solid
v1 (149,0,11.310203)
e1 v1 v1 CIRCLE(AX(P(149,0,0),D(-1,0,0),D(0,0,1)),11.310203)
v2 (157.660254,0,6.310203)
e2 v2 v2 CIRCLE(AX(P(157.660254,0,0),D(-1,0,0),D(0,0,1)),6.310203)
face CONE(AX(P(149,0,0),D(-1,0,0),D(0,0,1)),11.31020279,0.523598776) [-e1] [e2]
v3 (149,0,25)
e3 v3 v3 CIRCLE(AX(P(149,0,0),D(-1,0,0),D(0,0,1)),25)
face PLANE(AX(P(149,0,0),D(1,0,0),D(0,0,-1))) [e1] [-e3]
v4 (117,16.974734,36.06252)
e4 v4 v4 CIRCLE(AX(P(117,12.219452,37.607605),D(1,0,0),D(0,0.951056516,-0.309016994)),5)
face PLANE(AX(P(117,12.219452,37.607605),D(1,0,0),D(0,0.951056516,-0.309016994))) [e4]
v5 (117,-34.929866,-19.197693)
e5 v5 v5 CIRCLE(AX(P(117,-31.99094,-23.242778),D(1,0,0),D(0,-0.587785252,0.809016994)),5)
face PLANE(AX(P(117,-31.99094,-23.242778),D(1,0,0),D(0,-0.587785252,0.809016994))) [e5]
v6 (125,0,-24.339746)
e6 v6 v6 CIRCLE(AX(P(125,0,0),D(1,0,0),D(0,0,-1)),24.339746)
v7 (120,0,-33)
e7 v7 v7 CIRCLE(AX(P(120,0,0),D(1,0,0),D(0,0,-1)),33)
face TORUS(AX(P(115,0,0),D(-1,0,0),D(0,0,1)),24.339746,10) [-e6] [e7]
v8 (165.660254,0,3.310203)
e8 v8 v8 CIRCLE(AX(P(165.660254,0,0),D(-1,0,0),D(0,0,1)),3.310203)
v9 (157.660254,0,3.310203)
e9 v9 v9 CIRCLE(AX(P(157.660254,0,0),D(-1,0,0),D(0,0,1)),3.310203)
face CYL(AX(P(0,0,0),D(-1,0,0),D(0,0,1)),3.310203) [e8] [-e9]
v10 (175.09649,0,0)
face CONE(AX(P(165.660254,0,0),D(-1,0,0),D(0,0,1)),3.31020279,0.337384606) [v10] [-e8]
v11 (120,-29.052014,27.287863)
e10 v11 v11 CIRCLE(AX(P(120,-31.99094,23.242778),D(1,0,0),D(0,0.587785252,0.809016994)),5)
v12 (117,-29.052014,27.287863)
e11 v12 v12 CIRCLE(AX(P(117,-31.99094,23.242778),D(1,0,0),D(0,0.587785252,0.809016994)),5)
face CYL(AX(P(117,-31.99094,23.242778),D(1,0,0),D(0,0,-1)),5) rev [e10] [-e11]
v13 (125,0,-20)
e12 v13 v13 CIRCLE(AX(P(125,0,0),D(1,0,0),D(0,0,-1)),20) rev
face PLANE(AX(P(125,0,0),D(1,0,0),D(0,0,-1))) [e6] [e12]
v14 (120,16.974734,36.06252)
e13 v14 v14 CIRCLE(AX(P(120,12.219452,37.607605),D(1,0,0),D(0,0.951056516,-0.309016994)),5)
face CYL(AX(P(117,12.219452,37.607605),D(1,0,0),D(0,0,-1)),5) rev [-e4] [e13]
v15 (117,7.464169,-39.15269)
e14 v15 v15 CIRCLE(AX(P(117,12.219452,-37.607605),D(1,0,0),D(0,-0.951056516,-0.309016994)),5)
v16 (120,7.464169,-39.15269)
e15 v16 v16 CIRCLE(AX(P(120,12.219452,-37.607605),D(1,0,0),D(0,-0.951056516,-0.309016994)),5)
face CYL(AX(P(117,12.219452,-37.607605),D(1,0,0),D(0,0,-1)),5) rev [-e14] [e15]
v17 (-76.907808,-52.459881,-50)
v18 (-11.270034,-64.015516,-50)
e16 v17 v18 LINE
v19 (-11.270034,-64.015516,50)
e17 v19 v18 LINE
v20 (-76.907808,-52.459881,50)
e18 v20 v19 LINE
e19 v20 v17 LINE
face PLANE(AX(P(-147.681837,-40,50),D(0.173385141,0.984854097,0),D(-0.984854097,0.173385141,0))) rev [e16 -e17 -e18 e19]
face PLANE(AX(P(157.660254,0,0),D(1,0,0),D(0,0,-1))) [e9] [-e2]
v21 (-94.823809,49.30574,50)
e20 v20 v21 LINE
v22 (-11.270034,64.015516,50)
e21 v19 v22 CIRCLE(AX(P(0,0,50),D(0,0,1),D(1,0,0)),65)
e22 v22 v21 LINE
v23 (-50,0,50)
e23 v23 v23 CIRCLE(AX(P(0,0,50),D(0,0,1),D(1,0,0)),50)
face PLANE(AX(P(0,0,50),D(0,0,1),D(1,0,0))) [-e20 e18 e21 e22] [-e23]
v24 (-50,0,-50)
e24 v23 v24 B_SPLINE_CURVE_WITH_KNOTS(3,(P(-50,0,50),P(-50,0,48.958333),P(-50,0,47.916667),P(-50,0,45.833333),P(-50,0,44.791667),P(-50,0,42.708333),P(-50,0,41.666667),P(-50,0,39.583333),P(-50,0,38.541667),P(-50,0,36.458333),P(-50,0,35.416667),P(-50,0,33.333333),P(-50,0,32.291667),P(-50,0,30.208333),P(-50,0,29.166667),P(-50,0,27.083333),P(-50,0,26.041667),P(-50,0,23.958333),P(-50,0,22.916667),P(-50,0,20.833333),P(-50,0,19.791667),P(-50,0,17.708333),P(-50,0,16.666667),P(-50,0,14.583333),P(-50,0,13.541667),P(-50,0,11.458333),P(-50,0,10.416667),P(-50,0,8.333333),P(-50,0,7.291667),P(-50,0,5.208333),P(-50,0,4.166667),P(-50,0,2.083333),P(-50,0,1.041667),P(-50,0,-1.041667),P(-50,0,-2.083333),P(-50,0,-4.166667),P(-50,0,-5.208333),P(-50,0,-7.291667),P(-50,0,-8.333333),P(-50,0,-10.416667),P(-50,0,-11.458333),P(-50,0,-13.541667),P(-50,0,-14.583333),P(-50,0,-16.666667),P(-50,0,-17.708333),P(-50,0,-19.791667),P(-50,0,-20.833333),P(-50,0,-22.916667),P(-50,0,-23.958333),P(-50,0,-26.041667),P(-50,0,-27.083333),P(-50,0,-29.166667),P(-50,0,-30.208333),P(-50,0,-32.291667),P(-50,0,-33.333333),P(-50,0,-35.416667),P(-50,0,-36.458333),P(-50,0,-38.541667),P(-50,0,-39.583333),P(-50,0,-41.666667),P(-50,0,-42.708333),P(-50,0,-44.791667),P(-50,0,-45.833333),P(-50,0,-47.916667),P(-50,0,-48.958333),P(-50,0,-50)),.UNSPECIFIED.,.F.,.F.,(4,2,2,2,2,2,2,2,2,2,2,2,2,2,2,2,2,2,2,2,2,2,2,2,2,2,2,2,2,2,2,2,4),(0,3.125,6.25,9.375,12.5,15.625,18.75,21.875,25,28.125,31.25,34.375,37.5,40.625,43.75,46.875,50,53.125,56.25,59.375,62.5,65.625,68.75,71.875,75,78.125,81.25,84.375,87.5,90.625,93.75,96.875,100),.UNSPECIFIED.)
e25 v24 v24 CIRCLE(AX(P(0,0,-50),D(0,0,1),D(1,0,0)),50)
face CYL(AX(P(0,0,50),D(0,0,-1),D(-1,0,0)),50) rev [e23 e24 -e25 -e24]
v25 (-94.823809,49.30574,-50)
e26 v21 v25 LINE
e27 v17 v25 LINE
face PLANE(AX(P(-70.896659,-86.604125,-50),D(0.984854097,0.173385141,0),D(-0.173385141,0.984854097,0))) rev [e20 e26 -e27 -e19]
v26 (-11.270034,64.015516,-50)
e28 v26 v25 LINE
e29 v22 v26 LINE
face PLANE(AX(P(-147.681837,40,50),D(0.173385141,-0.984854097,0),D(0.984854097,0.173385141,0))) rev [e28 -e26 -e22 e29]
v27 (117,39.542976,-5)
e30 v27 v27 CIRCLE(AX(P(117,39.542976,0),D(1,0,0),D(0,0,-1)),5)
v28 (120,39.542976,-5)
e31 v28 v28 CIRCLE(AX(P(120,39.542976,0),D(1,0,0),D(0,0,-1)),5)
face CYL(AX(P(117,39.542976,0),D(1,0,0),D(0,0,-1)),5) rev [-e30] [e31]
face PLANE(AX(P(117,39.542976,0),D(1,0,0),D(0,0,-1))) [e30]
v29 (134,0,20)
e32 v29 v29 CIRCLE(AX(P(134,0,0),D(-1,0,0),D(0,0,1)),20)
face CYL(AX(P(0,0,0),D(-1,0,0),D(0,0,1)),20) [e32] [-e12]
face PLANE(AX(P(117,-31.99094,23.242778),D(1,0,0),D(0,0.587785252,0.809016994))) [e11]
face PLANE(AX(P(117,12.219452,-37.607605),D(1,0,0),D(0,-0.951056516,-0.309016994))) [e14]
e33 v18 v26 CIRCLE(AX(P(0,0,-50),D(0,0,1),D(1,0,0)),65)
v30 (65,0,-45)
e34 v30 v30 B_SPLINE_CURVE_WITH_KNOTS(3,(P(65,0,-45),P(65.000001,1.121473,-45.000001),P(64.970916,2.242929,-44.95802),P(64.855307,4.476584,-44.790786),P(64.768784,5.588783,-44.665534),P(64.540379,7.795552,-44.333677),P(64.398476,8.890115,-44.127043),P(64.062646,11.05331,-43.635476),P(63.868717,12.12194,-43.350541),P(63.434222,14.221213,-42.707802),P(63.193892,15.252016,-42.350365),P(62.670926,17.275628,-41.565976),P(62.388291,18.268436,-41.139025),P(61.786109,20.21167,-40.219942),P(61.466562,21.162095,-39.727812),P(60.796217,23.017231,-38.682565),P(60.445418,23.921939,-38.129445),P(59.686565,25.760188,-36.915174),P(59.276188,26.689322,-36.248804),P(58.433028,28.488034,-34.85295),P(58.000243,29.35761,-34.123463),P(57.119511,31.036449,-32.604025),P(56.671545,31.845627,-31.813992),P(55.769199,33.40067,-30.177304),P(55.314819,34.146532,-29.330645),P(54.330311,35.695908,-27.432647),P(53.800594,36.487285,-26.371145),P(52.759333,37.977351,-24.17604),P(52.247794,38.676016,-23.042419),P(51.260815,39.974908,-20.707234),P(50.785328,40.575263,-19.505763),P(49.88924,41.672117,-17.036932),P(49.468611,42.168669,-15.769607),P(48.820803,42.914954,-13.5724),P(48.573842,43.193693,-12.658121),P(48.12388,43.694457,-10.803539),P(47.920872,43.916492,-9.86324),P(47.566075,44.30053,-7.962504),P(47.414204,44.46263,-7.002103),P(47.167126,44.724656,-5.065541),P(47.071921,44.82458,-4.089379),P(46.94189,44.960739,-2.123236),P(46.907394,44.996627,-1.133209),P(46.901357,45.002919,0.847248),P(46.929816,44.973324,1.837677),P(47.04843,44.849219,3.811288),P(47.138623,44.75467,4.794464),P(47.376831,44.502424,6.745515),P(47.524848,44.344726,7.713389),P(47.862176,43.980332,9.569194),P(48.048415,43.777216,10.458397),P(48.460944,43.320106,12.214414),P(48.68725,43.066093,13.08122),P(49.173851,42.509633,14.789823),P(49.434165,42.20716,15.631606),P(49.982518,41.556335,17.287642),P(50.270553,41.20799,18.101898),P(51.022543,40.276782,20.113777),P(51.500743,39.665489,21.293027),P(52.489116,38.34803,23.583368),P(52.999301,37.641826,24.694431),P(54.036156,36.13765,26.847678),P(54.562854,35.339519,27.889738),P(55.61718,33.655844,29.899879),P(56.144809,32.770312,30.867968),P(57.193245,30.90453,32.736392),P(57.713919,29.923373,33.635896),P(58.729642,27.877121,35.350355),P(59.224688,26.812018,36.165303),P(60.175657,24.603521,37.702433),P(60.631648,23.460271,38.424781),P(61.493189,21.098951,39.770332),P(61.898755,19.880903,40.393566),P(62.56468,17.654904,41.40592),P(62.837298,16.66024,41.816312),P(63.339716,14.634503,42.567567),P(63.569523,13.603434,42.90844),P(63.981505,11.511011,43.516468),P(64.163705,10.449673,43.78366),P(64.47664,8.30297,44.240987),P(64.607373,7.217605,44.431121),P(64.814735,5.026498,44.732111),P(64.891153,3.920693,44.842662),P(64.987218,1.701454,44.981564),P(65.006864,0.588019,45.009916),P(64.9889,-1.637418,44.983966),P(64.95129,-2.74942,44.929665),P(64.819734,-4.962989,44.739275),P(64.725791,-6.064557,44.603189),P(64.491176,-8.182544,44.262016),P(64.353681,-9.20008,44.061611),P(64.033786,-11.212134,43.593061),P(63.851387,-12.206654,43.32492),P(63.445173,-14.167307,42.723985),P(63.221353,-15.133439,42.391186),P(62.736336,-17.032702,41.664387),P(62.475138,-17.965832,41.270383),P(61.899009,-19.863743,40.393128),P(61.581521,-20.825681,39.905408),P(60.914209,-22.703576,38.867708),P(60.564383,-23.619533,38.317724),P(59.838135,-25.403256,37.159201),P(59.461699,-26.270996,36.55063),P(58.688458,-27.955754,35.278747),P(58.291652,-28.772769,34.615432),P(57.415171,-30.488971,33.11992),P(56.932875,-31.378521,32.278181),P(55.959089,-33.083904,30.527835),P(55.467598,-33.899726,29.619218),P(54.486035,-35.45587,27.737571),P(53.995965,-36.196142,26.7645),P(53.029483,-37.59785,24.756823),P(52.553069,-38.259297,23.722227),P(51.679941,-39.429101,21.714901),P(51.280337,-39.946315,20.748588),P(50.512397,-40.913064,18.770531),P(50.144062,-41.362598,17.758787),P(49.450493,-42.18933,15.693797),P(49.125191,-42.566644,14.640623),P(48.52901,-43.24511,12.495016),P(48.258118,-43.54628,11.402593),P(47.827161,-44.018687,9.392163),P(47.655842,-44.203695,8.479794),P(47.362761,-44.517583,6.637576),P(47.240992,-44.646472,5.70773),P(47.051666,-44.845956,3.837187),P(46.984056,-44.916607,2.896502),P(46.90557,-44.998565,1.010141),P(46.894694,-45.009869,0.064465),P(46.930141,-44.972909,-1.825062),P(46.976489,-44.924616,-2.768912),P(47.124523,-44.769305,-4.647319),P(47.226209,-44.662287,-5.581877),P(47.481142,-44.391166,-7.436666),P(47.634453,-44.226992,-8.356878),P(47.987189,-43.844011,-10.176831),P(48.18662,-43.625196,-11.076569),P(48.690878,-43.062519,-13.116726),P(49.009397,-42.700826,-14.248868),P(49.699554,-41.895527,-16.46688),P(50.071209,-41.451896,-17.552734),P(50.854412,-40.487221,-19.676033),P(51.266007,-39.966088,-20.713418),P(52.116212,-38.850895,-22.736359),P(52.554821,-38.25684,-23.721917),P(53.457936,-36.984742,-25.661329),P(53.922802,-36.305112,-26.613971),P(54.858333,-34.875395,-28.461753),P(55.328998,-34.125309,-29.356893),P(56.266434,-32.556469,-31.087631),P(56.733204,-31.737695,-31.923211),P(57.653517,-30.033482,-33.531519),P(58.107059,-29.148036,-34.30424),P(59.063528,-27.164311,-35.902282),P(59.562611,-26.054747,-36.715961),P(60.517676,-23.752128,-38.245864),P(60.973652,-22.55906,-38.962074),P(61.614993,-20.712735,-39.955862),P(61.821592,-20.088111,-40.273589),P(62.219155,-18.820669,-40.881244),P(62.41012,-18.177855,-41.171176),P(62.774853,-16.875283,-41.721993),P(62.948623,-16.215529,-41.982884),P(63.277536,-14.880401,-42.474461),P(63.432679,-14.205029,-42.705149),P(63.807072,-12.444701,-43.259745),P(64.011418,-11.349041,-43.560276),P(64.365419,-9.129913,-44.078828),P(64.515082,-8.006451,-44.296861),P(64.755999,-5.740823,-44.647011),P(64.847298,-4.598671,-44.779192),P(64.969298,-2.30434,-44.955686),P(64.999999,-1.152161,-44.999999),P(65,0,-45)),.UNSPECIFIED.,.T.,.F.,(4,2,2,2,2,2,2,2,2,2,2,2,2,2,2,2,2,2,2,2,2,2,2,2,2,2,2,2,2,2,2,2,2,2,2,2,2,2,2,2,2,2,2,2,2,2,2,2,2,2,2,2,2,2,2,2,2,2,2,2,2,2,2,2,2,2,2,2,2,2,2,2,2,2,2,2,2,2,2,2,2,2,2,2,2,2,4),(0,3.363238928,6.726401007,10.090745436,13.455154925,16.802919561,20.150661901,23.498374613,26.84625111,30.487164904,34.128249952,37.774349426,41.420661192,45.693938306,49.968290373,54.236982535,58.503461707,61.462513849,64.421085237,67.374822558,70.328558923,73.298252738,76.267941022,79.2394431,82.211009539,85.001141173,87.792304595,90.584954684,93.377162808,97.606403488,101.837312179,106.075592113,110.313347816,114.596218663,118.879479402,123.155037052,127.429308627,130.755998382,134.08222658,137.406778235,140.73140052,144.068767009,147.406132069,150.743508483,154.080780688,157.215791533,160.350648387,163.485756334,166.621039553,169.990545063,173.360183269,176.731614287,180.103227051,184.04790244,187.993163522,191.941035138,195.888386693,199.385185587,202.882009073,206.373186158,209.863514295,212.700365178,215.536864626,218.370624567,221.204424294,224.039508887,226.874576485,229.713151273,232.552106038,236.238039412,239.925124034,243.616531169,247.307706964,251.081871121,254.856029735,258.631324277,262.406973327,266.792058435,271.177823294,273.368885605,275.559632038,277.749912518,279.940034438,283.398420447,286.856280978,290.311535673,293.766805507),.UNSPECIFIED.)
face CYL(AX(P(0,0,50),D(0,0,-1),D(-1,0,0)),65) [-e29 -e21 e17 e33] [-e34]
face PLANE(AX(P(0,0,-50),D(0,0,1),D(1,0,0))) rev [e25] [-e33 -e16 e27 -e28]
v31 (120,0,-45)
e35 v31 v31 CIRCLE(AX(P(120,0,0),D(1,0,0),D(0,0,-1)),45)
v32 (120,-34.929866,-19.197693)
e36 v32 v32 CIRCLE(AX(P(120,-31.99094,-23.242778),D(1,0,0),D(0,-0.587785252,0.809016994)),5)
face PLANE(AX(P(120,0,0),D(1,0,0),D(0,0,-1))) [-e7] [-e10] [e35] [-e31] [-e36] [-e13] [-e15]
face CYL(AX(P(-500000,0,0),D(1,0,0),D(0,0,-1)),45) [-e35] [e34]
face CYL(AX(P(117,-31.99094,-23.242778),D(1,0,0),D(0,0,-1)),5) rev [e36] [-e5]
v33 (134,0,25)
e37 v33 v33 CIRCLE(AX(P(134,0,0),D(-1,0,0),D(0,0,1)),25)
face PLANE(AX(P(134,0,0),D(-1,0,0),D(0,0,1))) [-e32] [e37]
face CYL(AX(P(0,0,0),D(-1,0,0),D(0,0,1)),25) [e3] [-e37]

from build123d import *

# Parameters (mm, degrees)
SKETCH1_R                = 50
BOSS_EXTRUDE1_DEPTH      = 50
BOSS_EXTRUDE2_REACH      = 281.962
BOSS_EXTRUDE2_END_RADIUS = 65
SKETCH2_R                = 45
SKETCH4_R                = 5
CUT_EXTRUDE4_DEPTH       = 3
CIRPATTERN2_COUNT        = 5
SKETCH5_R                = 33
BOSS_EXTRUDE3_DEPTH      = 5
FILLET1_R                = 10
SKETCH6_W                = 100
SKETCH6_H                = 80
CUT_EXTRUDE5_DEPTH       = 37
SKETCH7_W                = 37.232866149
SKETCH7_H                = 100
CUT_EXTRUDE6_DEPTH       = 8
SKETCH8_W                = 37
SKETCH8_H                = 100
CUT_EXTRUDE7_DEPTH       = 8
SKETCH9_W                = 16.438055999
SKETCH9_H                = 100
CUT_EXTRUDE8_DEPTH       = 138
CUT_EXTRUDE9_DEPTH       = 138
CUT_EXTRUDE10_DEPTH      = 138


with BuildPart() as part:
    # Sketch1 → Boss-Extrude1 (new, symmetric)
    with BuildSketch(Plane.XY):
        with BuildLine():
            Line((-147.681836523, 40), (-147.681836523, -40))
            Line((-147.681836523, -40), (-11.270034193, -64.015516317))
            ThreePointArc((-11.270034193, -64.015516317), (65, 0), (-11.270034193, 64.015516317))
            Line((-11.270034193, 64.015516317), (-147.681836523, 40))
        make_face()
        with Locations(Location((0, 0, 0), (0, 0, 180))):
            Circle(SKETCH1_R, mode=Mode.SUBTRACT)
    extrude(amount=BOSS_EXTRUDE1_DEPTH, both=True)

    # Boss-Extrude2: up to this cylinder (the profile starts outside it)
    boss_extrude2_end = Plane(origin=(0, 0, 0), z_dir=(0, 0, -1)) * Cylinder(BOSS_EXTRUDE2_END_RADIUS, 694.924, mode=Mode.PRIVATE)
    # Sketch2 → Boss-Extrude2 (add, up to the surface)
    with BuildSketch(Plane(origin=(120, 0, 0), x_dir=(0, 0, -1), z_dir=(1, 0, 0)), mode=Mode.PRIVATE) as boss_extrude2_sk1:
        Circle(SKETCH2_R)
    boss_extrude2_tool1 = extrude(boss_extrude2_sk1.sketch, amount=-BOSS_EXTRUDE2_REACH, mode=Mode.PRIVATE) - boss_extrude2_end
    add(boss_extrude2_tool1.solids().sort_by_distance((120, 0, 0))[0])

    # Sketch3 → Revolve1 (revolve)
    with BuildSketch(Plane.XY, mode=Mode.PRIVATE) as revolve1_sk:
        Polygon((175.096490443, 0), (120, 0), (120, -20), (134, -20), (134, -25), (149, -25), (149, -11.31020279), (157.660254038, -6.31020279), (157.660254038, -3.31020279), (165.660254038, -3.31020279), align=None)
    revolve(revolve1_sk.sketch.rotate(Axis((0, 0, 0), (1, 0, 0)), 270), axis=Axis((0, 0, 0), (1, 0, 0)))

    # Sketch4 → Cut-Extrude4 (cut)
    with BuildSketch(Plane(origin=(120, 0, 0), x_dir=(0, 0, -1), z_dir=(1, 0, 0))):
        with Locations((0, 39.542976343)):
            Circle(SKETCH4_R)
    cut_extrude4 = extrude(amount=-CUT_EXTRUDE4_DEPTH, mode=Mode.SUBTRACT)

    # CirPattern2: Cut-Extrude4 ×5 about axis
    cirpattern2_axis = Axis((0, 0, 0), (1, 0, 0))
    for i in range(1, CIRPATTERN2_COUNT):
        add(cut_extrude4.rotate(cirpattern2_axis, i * 360 / CIRPATTERN2_COUNT), mode=Mode.SUBTRACT)

    # Sketch5 → Boss-Extrude3 (add)
    with BuildSketch(Plane(origin=(120, 0, 0), x_dir=(0, 0, -1), z_dir=(1, 0, 0))):
        Circle(SKETCH5_R)
    extrude(amount=BOSS_EXTRUDE3_DEPTH)

    # Fillet1
    # the kernel refuses this fillet: 10 mm, written as the material it takes off along each edge
    with BuildSketch(Plane(origin=(125, 0, 0), x_dir=(0, 0, -1), z_dir=(0, -1, 0))) as fillet1_piece_1:
        with BuildLine():
            CenterArc((24.339745962, -10), FILLET1_R, 30, 60)
            Line((24.339745962, 0), (24.339745962, 0.2))
            Line((24.339745962, 0.2), (33, 0.2))
            Line((33, 0.2), (33.2, 0))
            ThreePointArc((33.2, 0), (33.2, -2.5), (33.173205081, -4.9))
            Line((33.173205081, -4.9), (33, -5))
        make_face()
    revolve(axis=Axis((125, 0, 0), (1, 0, 0)), mode=Mode.SUBTRACT)

    # Sketch6 → Cut-Extrude5 (cut)
    with BuildSketch(Plane.ZY.offset(147.681836523)):
        Rectangle(SKETCH6_W, SKETCH6_H)
    extrude(amount=-CUT_EXTRUDE5_DEPTH, mode=Mode.SUBTRACT)

    # Sketch7 → Cut-Extrude6 (cut)
    with BuildSketch(Plane(origin=(-11.270034193, 64.015516317, 0), x_dir=(0.9848540971786934, 0.17338514143472855, 0), z_dir=(-0.17338514143472852, 0.9848540971786933, 0))):
        with Locations((-119.893223046, 0)):
            Rectangle(SKETCH7_W, SKETCH7_H)
    extrude(amount=-CUT_EXTRUDE6_DEPTH, mode=Mode.SUBTRACT)

    # Sketch8 → Cut-Extrude7 (cut)
    with BuildSketch(Plane(origin=(0, -40, 0), x_dir=(1, 0, 0), z_dir=(0, 1, 0))):
        with Locations((-129.181836523, 0)):
            Rectangle(SKETCH8_W, SKETCH8_H)
    extrude(amount=-CUT_EXTRUDE7_DEPTH, mode=Mode.SUBTRACT)

    # Sketch9 → Cut-Extrude8 (cut)
    with BuildSketch(Plane(origin=(-11.270034193, 64.015516317, 0), x_dir=(0.9848540971786934, 0.17338514143472855, 0), z_dir=(-0.17338514143472852, 0.9848540971786933, 0))):
        with Locations((-93.057761973, 0)):
            Rectangle(SKETCH9_W, SKETCH9_H)
    extrude(amount=-CUT_EXTRUDE8_DEPTH, mode=Mode.SUBTRACT)


with BuildPart() as cut_extrude8_piece_1:
    # of the separate pieces the step leaves, piece 1, a body of its own (cut_extrude8_pieces)
    add(part.part.solids().sort_by_distance((-11.270034193, 64.015516317, 50))[0])


with BuildPart() as cut_extrude8_piece_2:
    # of the separate pieces the step leaves, piece 2, a body of its own (cut_extrude8_pieces)
    add(part.part.solids().sort_by_distance((-109.625814615, 38.576792986, 50))[0])

    # Sketch10 → Cut-Extrude9 (cut)
    with BuildSketch(Plane.XY.offset(50)):
        Polygon((-110.681836523, -46.51390927), (-110.681836523, 38.390878637), (-107.391706575, 38.390878637), (-90.237190338, -50.805264009), (-110.681836523, -50.805264009), align=None)
    extrude(amount=-CUT_EXTRUDE9_DEPTH, mode=Mode.SUBTRACT)

    # Sketch11 → Cut-Extrude10 (cut)
    with BuildSketch(Plane(origin=(-9.882953062, 56.136683539, 0), x_dir=(0.9848540971786934, 0.17338514143472858, 0), z_dir=(-0.17338514143472855, 0.9848540971786933, 0))):
        Polygon((-96.059625261, -51.911327494), (-97.962360053, 56.770253773), (-112.335310265, 50), (-108.517558636, -51.911327494), align=None)
    extrude(amount=-CUT_EXTRUDE10_DEPTH, mode=Mode.SUBTRACT)


solid = cut_extrude8_piece_1.part
